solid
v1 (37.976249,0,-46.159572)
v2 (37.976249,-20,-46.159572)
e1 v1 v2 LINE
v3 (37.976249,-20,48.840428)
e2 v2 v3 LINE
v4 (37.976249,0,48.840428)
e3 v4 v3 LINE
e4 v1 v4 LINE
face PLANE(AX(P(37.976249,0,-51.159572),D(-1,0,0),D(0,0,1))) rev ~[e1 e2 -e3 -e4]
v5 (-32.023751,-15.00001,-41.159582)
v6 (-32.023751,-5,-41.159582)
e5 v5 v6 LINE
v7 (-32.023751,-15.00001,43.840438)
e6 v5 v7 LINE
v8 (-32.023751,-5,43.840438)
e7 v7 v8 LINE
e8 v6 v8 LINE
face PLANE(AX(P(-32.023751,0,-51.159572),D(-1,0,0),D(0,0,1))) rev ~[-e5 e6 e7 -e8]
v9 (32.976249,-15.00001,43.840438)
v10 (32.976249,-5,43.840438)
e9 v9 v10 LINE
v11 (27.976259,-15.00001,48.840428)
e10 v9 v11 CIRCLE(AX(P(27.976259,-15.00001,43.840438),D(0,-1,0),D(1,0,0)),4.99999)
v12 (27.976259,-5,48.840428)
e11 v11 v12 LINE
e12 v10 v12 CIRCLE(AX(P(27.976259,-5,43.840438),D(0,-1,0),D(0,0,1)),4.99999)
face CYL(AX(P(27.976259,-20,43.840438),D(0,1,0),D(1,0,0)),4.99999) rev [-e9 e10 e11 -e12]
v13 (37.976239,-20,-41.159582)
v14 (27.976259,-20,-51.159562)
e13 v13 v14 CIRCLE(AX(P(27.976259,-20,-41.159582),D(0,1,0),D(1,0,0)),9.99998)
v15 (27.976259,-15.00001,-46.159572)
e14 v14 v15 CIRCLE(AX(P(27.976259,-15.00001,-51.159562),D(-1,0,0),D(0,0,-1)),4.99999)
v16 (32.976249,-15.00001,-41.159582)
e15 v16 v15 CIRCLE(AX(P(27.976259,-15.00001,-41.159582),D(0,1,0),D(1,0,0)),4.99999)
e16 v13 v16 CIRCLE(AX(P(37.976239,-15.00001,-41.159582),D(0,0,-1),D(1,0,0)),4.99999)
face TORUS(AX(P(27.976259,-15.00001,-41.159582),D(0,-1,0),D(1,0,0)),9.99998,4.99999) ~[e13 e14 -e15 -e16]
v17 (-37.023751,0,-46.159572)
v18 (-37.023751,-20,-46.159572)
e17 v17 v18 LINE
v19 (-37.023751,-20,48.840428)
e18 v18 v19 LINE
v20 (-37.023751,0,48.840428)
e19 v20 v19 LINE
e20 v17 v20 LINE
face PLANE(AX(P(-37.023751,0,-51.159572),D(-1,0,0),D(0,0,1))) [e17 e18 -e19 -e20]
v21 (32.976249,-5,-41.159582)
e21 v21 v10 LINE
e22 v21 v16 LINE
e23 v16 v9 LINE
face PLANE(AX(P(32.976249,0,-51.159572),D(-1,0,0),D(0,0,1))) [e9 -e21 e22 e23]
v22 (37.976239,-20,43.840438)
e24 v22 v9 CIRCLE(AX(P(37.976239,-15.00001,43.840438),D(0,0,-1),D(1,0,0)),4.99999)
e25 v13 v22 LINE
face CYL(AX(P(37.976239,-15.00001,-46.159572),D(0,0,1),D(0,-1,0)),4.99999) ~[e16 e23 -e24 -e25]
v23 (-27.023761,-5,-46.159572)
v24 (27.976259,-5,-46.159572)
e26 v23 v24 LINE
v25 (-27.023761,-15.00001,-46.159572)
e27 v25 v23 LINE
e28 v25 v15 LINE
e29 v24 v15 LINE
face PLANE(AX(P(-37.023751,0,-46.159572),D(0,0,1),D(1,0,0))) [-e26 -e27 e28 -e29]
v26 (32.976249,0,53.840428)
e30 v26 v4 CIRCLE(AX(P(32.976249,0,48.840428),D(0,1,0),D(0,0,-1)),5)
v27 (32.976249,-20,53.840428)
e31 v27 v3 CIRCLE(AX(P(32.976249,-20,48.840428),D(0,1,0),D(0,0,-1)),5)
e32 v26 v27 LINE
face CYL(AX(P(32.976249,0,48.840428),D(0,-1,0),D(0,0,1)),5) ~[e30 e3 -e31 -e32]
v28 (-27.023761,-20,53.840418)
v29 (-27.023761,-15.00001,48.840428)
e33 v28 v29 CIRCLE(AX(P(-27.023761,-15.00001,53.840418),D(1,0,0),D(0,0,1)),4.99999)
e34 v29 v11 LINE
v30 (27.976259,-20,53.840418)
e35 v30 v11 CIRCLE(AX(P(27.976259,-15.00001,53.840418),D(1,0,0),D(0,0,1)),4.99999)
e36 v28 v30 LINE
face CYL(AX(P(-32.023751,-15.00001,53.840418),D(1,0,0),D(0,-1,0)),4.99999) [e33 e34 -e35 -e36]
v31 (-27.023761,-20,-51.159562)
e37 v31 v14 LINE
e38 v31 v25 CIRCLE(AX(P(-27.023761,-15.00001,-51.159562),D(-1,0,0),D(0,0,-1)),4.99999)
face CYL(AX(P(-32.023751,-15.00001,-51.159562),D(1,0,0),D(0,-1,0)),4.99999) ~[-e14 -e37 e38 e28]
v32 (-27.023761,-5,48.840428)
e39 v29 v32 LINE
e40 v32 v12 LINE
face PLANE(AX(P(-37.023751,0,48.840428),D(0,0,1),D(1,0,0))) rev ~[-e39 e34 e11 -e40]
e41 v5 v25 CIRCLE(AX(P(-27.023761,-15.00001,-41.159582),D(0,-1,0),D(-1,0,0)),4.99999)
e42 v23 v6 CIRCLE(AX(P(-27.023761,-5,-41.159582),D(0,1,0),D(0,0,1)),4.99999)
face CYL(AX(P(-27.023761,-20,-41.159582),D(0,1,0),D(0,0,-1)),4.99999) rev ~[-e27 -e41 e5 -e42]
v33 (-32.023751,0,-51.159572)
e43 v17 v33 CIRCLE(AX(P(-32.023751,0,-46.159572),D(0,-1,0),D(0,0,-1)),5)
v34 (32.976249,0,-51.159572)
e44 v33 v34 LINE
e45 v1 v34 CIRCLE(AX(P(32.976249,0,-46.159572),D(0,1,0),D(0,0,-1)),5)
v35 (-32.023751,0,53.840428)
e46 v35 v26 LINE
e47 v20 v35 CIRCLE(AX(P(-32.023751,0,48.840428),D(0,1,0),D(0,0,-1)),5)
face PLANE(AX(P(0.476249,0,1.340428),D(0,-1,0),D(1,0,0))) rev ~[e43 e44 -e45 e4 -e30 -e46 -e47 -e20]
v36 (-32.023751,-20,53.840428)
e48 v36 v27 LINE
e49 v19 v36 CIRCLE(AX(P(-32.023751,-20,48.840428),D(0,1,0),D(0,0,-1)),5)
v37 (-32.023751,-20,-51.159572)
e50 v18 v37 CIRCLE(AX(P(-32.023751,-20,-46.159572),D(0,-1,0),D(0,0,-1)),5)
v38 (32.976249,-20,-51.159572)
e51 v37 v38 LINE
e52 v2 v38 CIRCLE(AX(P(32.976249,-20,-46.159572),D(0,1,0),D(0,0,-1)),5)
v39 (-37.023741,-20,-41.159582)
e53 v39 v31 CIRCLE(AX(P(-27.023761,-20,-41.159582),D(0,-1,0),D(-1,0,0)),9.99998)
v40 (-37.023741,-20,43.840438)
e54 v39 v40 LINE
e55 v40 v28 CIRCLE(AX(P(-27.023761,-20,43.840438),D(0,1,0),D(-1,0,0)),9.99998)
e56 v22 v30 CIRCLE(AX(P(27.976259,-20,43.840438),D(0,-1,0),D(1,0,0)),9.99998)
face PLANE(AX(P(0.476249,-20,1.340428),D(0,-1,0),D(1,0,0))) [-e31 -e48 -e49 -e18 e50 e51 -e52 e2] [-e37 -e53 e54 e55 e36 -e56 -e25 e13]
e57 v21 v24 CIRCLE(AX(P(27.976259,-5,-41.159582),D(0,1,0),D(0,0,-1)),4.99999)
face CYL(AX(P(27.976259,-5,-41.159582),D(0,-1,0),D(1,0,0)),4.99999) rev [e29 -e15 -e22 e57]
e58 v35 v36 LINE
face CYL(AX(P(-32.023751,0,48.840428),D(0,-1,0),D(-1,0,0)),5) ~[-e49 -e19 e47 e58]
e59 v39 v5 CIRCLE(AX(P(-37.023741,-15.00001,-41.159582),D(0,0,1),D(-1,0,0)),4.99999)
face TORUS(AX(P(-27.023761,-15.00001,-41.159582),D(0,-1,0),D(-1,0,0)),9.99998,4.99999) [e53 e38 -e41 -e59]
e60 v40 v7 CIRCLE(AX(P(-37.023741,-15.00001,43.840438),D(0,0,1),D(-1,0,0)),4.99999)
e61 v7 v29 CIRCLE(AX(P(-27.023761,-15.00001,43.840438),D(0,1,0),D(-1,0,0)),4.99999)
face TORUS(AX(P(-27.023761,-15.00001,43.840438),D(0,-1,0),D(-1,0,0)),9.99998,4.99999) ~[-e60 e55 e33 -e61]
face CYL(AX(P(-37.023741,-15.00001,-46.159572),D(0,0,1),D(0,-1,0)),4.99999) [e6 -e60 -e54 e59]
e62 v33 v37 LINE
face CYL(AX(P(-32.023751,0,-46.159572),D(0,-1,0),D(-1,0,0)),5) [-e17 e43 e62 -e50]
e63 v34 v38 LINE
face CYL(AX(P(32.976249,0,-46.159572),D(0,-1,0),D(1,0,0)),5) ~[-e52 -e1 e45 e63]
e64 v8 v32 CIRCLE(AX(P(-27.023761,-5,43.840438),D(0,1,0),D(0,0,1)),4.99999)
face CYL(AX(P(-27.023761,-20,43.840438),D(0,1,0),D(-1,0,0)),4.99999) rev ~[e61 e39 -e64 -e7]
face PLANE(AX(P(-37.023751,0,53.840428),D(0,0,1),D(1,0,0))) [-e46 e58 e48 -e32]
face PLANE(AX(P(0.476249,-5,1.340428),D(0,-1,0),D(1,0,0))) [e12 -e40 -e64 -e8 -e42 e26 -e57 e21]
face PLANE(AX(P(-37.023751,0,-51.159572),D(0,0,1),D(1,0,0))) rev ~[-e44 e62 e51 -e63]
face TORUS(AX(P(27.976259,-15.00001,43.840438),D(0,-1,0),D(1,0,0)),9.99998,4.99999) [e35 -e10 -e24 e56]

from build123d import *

# Parameters (mm, degrees)
F0_W     = 75
F0_H     = 105
F1_DEPTH = 20
F2_T     = -5
F3_R     = 5
F3_R_2   = 4.99999


# Not quite as in the source:
# - a fillet or chamfer is up to 0.001 mm smaller than in the source, because OpenCascade refuses the exact size


with BuildPart() as f1:
    # F0 (on Front) → F1 (new body)
    with BuildSketch(Plane.XZ):
        with Locations((0.4762494937, 1.3404280991)):
            Rectangle(F0_W, F0_H)
    extrude(amount=F1_DEPTH)

    # F2
    f2_openings = [f1.faces().sort_by_distance(p)[0] for p in [
        (0.476249, -20, 1.340428),
    ]]
    offset(amount=F2_T, openings=f2_openings)

    # F3 (call 1 of 5: OpenCascade refuses the feature's edges together)
    f3_edges = [f1.edges().sort_by_distance(p)[0] for p in [
        (-37.023751, -10, 53.840428),
    ]]
    fillet(f3_edges, radius=F3_R)

    # F3#2 (call 2 of 5)
    f3_2_edges = [f1.edges().sort_by_distance(p)[0] for p in [
        (-37.023751, -10, -51.159572),
    ]]
    fillet(f3_2_edges, radius=F3_R)

    # F3#3 (call 3 of 5)
    f3_3_edges = [f1.edges().sort_by_distance(p)[0] for p in [
        (37.976249, -10, 53.840428),
    ]]
    fillet(f3_3_edges, radius=F3_R)

    # F3#4 (call 4 of 5)
    f3_4_edges = [f1.edges().sort_by_distance(p)[0] for p in [
        (37.976249, -10, -51.159572),
    ]]
    fillet(f3_4_edges, radius=F3_R)

    # F3#5 (call 5 of 5) (radius 5 in the source; OpenCascade refuses exactly that, so slightly less here)
    f3_5_edges = [f1.edges().sort_by_distance(p)[0] for p in [
        (-32.023751, -12.5, 48.840428),
        (32.976249, -12.5, 48.840428),
        (-32.023751, -12.5, -46.159572),
        (32.976249, -12.5, -46.159572),
        (32.976249, -20, 1.340428),
        (-32.023751, -20, 1.340428),
        (0.476249, -20, 48.840428),
        (0.476249, -20, -46.159572),
    ]]
    fillet(f3_5_edges, radius=F3_R_2)


solid = f1.part
